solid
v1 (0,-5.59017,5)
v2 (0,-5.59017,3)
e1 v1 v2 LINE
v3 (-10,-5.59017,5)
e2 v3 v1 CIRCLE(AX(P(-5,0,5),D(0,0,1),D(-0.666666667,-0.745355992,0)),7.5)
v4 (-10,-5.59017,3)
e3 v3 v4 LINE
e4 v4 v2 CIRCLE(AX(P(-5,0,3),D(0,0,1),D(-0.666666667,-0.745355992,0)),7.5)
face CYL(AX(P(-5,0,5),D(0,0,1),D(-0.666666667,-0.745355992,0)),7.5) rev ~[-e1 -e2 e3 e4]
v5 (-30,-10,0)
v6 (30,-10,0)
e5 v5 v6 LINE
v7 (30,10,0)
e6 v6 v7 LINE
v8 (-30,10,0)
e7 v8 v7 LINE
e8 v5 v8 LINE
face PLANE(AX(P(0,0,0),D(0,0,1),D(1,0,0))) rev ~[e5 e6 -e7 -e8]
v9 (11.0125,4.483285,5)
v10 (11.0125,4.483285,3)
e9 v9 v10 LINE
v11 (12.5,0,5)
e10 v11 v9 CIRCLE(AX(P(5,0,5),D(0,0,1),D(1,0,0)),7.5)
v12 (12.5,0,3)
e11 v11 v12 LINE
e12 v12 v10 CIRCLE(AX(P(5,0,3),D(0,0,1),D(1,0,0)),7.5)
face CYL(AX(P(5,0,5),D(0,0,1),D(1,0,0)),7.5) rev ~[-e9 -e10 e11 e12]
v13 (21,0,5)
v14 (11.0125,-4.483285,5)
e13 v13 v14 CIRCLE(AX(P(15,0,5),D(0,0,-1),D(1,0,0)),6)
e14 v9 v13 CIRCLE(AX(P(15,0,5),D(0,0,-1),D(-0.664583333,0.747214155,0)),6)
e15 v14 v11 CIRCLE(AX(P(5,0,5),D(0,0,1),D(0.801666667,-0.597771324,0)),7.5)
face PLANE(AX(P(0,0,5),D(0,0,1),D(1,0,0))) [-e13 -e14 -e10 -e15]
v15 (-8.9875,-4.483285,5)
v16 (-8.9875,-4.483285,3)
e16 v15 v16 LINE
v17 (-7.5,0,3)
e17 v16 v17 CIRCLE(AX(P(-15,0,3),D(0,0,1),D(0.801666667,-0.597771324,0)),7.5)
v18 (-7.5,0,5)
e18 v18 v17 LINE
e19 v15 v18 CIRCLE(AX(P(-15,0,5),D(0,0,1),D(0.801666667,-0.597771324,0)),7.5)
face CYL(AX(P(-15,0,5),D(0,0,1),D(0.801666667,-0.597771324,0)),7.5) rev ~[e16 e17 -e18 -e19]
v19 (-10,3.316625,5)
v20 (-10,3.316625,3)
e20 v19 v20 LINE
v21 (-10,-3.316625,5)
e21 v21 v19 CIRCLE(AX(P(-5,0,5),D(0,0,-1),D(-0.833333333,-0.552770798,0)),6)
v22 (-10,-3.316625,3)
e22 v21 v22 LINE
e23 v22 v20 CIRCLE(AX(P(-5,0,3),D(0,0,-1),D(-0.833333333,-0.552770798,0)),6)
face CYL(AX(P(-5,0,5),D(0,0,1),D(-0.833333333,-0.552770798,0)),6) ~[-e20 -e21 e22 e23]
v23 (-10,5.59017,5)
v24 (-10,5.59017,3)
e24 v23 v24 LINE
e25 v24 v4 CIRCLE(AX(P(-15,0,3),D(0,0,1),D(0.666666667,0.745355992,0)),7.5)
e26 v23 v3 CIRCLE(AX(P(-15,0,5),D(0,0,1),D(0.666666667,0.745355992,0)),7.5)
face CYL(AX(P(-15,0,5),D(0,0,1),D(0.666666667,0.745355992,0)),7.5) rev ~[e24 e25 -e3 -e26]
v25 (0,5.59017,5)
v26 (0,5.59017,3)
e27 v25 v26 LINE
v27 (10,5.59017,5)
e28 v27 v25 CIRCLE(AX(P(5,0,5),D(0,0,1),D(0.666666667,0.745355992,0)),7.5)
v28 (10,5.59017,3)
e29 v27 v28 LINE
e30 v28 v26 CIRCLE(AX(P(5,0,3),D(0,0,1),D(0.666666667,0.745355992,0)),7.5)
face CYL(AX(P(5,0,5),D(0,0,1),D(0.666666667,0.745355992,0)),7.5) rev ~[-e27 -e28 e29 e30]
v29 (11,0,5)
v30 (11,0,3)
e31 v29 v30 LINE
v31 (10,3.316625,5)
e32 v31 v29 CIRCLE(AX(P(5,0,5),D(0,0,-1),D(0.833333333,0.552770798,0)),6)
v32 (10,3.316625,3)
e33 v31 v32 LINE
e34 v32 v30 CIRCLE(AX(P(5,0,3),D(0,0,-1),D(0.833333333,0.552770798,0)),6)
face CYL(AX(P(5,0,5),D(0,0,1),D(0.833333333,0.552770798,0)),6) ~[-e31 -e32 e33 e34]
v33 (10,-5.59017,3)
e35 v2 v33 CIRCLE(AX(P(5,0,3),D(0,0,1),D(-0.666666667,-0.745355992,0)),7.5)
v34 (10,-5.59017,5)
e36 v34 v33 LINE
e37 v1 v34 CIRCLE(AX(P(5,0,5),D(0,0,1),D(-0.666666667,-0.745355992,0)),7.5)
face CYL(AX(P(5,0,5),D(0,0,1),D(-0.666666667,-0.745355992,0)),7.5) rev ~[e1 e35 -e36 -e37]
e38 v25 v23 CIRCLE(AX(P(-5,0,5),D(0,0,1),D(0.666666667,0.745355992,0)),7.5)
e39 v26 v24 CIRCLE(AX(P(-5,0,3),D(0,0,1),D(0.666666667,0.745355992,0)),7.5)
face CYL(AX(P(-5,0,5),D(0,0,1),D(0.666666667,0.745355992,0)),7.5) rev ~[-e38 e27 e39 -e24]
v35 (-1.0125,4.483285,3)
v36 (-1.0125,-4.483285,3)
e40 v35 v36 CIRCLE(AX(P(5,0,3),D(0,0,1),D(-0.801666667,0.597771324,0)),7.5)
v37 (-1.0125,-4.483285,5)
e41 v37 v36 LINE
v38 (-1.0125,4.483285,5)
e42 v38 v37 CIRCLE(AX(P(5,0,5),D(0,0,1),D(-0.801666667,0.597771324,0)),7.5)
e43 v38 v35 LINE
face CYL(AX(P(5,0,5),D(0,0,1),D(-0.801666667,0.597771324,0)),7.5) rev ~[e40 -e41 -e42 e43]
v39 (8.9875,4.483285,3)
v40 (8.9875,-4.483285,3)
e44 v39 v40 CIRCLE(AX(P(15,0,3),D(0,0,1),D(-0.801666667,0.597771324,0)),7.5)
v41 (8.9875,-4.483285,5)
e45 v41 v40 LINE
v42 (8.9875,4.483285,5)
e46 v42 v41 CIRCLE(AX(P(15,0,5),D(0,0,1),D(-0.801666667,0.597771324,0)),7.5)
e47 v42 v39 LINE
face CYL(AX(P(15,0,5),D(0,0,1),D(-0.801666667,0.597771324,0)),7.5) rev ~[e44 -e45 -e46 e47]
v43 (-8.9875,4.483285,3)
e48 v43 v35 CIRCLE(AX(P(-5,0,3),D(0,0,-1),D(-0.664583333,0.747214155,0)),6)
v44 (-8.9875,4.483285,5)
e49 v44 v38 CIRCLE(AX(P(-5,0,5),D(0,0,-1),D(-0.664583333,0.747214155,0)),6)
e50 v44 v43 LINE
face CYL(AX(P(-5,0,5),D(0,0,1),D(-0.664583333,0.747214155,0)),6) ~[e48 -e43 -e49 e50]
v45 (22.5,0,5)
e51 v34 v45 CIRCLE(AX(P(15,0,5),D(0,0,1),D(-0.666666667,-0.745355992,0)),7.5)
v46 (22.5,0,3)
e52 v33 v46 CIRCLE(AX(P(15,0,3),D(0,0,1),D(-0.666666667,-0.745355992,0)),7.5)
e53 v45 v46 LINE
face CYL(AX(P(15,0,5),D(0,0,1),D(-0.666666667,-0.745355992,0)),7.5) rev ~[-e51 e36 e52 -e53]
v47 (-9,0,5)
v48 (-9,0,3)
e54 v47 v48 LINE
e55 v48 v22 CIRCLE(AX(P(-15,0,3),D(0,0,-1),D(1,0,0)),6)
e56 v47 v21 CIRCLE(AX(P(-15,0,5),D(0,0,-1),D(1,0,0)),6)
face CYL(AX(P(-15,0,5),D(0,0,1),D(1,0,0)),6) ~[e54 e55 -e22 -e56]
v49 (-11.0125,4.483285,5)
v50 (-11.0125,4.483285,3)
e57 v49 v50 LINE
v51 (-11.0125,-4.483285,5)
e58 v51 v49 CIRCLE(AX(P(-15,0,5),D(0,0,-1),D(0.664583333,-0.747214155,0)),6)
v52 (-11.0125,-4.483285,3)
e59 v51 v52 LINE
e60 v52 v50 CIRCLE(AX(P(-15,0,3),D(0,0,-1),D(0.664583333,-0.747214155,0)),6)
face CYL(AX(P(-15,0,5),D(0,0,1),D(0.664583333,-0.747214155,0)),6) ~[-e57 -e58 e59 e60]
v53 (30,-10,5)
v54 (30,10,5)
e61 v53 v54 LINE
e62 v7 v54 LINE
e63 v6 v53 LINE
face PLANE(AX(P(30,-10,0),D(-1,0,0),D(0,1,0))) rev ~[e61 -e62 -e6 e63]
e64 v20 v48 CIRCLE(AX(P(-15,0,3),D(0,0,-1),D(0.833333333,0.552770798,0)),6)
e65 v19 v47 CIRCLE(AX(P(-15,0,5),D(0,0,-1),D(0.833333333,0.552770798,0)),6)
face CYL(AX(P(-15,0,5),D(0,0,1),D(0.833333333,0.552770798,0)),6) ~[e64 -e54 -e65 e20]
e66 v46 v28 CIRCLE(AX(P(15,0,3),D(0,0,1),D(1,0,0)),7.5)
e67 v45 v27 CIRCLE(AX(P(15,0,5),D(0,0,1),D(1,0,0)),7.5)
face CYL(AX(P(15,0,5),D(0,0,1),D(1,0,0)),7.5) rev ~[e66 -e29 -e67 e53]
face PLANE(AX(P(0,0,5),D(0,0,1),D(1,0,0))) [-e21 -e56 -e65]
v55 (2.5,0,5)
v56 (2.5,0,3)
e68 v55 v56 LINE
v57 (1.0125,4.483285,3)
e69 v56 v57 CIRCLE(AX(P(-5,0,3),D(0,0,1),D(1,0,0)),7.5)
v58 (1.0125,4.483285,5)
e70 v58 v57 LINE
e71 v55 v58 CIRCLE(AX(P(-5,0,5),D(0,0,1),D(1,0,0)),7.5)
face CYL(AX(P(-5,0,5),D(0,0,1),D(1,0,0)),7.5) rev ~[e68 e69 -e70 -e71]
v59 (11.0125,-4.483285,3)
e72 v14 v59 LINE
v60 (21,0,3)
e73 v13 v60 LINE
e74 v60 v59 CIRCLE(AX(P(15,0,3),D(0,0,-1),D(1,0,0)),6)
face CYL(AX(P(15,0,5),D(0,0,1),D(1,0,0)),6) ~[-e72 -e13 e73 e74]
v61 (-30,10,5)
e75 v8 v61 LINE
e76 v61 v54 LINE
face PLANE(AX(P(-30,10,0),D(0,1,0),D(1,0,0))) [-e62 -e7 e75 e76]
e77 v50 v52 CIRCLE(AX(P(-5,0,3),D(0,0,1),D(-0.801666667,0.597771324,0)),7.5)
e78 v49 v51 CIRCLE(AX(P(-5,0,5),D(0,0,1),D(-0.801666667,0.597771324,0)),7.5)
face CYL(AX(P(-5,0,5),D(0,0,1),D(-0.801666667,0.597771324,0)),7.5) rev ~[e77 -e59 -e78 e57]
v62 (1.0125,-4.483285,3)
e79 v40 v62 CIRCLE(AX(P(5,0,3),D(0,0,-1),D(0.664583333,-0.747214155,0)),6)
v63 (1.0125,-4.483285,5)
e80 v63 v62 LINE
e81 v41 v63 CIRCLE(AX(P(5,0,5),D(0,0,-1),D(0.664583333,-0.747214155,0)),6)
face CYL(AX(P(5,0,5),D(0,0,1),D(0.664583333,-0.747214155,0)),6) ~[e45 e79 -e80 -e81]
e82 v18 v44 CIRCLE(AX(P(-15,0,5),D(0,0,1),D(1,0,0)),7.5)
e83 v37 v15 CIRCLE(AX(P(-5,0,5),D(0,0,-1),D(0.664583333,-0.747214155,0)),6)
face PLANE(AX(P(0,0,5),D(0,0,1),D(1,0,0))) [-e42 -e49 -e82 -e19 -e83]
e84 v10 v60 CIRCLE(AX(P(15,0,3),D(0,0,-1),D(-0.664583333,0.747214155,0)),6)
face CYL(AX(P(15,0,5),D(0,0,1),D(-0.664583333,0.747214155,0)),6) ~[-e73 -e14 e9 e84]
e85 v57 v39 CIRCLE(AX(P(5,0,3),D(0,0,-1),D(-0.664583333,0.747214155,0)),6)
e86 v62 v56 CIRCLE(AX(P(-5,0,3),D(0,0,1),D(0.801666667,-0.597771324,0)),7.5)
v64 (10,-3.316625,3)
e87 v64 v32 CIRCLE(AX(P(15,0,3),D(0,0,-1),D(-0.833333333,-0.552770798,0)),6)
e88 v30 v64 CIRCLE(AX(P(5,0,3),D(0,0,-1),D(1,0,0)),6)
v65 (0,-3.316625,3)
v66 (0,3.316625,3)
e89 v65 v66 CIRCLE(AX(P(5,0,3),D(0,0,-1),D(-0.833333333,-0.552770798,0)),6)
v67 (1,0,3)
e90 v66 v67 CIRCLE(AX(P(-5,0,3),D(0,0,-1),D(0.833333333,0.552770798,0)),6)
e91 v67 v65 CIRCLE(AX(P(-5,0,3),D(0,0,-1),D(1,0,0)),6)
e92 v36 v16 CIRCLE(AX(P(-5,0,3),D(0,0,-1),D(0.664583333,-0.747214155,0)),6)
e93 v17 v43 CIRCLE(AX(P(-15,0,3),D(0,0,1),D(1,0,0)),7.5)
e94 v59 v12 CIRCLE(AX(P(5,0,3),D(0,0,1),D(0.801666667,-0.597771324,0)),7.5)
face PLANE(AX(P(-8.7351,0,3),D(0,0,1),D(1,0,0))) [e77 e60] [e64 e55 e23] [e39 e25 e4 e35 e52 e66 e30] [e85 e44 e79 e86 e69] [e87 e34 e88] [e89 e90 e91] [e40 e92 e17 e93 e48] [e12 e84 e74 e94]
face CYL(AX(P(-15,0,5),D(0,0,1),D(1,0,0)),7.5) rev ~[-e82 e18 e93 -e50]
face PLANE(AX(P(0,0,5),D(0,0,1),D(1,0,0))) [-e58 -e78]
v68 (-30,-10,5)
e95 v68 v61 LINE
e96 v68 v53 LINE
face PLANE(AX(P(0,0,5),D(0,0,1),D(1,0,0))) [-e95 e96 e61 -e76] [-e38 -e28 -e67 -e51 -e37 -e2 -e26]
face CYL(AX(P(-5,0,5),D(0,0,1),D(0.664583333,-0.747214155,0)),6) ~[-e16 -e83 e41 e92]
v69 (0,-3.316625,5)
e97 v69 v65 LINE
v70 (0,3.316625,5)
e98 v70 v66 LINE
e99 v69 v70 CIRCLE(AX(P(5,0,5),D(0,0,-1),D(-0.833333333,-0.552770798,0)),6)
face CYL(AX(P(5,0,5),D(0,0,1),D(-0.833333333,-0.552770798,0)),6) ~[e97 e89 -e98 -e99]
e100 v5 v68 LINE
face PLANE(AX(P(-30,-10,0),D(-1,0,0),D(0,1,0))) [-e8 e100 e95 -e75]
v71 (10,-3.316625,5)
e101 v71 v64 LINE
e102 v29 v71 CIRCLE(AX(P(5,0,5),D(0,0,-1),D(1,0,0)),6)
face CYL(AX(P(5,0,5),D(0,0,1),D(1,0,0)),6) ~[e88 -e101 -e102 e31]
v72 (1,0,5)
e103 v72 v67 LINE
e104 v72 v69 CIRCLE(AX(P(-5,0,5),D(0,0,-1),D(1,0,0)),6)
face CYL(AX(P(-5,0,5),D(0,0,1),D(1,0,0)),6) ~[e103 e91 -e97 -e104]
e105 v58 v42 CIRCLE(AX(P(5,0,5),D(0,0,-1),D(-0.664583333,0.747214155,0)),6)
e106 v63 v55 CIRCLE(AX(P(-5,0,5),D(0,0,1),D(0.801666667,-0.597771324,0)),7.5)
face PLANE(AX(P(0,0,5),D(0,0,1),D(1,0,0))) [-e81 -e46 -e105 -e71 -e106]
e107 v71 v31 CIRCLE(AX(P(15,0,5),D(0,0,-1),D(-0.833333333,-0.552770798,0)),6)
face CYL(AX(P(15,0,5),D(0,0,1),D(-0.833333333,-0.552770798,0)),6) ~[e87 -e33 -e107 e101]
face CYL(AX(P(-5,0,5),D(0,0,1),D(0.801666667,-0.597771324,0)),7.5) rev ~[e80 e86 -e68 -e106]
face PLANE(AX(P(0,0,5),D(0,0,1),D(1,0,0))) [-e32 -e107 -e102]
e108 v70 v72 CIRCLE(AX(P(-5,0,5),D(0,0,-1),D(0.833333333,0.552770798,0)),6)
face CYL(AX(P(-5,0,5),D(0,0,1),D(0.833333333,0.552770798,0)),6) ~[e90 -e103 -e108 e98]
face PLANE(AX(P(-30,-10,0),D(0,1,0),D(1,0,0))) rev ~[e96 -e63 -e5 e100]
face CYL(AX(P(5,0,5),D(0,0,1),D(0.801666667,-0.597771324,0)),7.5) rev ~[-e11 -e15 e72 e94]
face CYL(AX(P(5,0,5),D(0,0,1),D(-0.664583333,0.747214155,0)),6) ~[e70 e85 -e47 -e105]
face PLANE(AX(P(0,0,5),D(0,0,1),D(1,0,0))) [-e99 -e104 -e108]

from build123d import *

# Parameters (mm, degrees)
F0_W     = 60
F0_H     = 20
F1_DEPTH = 5
F3_DEPTH = 2


with BuildPart() as f1:
    # F0 (on Top) → F1 (new body)
    with BuildSketch(Plane.XY):
        Rectangle(F0_W, F0_H)
    extrude(amount=F1_DEPTH)

    # F2 (on face) → F3 (cut)
    with BuildSketch(Plane.XY.offset(5)):
        with BuildLine():
            ThreePointArc((-8.9875, -4.4832849285), (-7.8815819875, -2.3618054535), (-7.5, 0))
            ThreePointArc((-7.5, 0), (-7.8815819875, 2.3618054535), (-8.9875, 4.4832849285))
            ThreePointArc((-8.9875, 4.4832849285), (-9.5314526404, 3.9326755483), (-10, 3.3166247904))
            ThreePointArc((-10, 3.3166247904), (-9.2554373535, 1.7320508076), (-9, 0))
            ThreePointArc((-9, 0), (-9.2554373535, -1.7320508076), (-10, -3.3166247904))
            ThreePointArc((-10, -3.3166247904), (-9.5314526404, -3.9326755483), (-8.9875, -4.4832849285))
        make_face()
        with BuildLine():
            ThreePointArc((-10, 3.3166247904), (-9.5314526404, 3.9326755483), (-8.9875, 4.4832849285))
            ThreePointArc((-8.9875, 4.4832849285), (-9.4660061735, 5.0621055232), (-10, 5.5901699437))
            ThreePointArc((-10, 5.5901699437), (-10.5339938265, 5.0621055232), (-11.0125, 4.4832849285))
            ThreePointArc((-11.0125, 4.4832849285), (-10.4685473596, 3.9326755483), (-10, 3.3166247904))
        make_face()
        with BuildLine():
            ThreePointArc((-10, 5.5901699437), (-9.4660061735, 5.0621055232), (-8.9875, 4.4832849285))
            ThreePointArc((-8.9875, 4.4832849285), (-5, 6), (-1.0125, 4.4832849285))
            ThreePointArc((-1.0125, 4.4832849285), (-0.5339938265, 5.0621055232), (0, 5.5901699437))
            ThreePointArc((0, 5.5901699437), (-5, 7.5), (-10, 5.5901699437))
        make_face()
        with BuildLine():
            ThreePointArc((-1.0125, -4.4832849285), (-5, -6), (-8.9875, -4.4832849285))
            ThreePointArc((-8.9875, -4.4832849285), (-9.4660061735, -5.0621055232), (-10, -5.5901699437))
            ThreePointArc((-10, -5.5901699437), (-5, -7.5), (0, -5.5901699437))
            ThreePointArc((0, -5.5901699437), (-0.5339938265, -5.0621055232), (-1.0125, -4.4832849285))
        make_face()
        with BuildLine():
            ThreePointArc((-10, -5.5901699437), (-9.4660061735, -5.0621055232), (-8.9875, -4.4832849285))
            ThreePointArc((-8.9875, -4.4832849285), (-9.5314526404, -3.9326755483), (-10, -3.3166247904))
            ThreePointArc((-10, -3.3166247904), (-10.4685473596, -3.9326755483), (-11.0125, -4.4832849285))
            ThreePointArc((-11.0125, -4.4832849285), (-10.5339938265, -5.0621055232), (-10, -5.5901699437))
        make_face()
        with BuildLine():
            ThreePointArc((-11.0125, 4.4832849285), (-10.5339938265, 5.0621055232), (-10, 5.5901699437))
            ThreePointArc((-10, 5.5901699437), (-22.5, 0), (-10, -5.5901699437))
            ThreePointArc((-10, -5.5901699437), (-10.5339938265, -5.0621055232), (-11.0125, -4.4832849285))
            ThreePointArc((-11.0125, -4.4832849285), (-21, 0), (-11.0125, 4.4832849285))
        make_face()
        with BuildLine():
            ThreePointArc((0, 5.5901699437), (-0.5339938265, 5.0621055232), (-1.0125, 4.4832849285))
            ThreePointArc((-1.0125, 4.4832849285), (-0.4685473596, 3.9326755483), (0, 3.3166247904))
            ThreePointArc((0, 3.3166247904), (0.4685473596, 3.9326755483), (1.0125, 4.4832849285))
            ThreePointArc((1.0125, 4.4832849285), (0.5339938265, 5.0621055232), (0, 5.5901699437))
        make_face()
        with BuildLine():
            ThreePointArc((0, 3.3166247904), (-0.4685473596, 3.9326755483), (-1.0125, 4.4832849285))
            ThreePointArc((-1.0125, 4.4832849285), (-2.5, 0), (-1.0125, -4.4832849285))
            ThreePointArc((-1.0125, -4.4832849285), (-0.4685473596, -3.9326755483), (0, -3.3166247904))
            ThreePointArc((0, -3.3166247904), (-1, 0), (0, 3.3166247904))
        make_face()
        with BuildLine():
            ThreePointArc((-10, -3.3166247904), (-11, 0), (-10, 3.3166247904))
            ThreePointArc((-10, 3.3166247904), (-10.4685473596, 3.9326755483), (-11.0125, 4.4832849285))
            ThreePointArc((-11.0125, 4.4832849285), (-12.5, 0), (-11.0125, -4.4832849285))
            ThreePointArc((-11.0125, -4.4832849285), (-10.4685473596, -3.9326755483), (-10, -3.3166247904))
        make_face()
        with BuildLine():
            ThreePointArc((0, -3.3166247904), (-0.4685473596, -3.9326755483), (-1.0125, -4.4832849285))
            ThreePointArc((-1.0125, -4.4832849285), (-0.5339938265, -5.0621055232), (0, -5.5901699437))
            ThreePointArc((0, -5.5901699437), (0.5339938265, -5.0621055232), (1.0125, -4.4832849285))
            ThreePointArc((1.0125, -4.4832849285), (0.4685473596, -3.9326755483), (0, -3.3166247904))
        make_face()
        with BuildLine():
            ThreePointArc((10, 5.5901699437), (5, 7.5), (0, 5.5901699437))
            ThreePointArc((0, 5.5901699437), (0.5339938265, 5.0621055232), (1.0125, 4.4832849285))
            ThreePointArc((1.0125, 4.4832849285), (5, 6), (8.9875, 4.4832849285))
            ThreePointArc((8.9875, 4.4832849285), (9.4660061735, 5.0621055232), (10, 5.5901699437))
        make_face()
        with BuildLine():
            ThreePointArc((1.0125, 4.4832849285), (0.4685473596, 3.9326755483), (0, 3.3166247904))
            ThreePointArc((0, 3.3166247904), (0.7445626465, 1.7320508076), (1, 0))
            ThreePointArc((1, 0), (0.7445626465, -1.7320508076), (0, -3.3166247904))
            ThreePointArc((0, -3.3166247904), (0.4685473596, -3.9326755483), (1.0125, -4.4832849285))
            ThreePointArc((1.0125, -4.4832849285), (2.1184180125, -2.3618054535), (2.5, 0))
            ThreePointArc((2.5, 0), (2.1184180125, 2.3618054535), (1.0125, 4.4832849285))
        make_face()
        with BuildLine():
            ThreePointArc((1.0125, -4.4832849285), (0.5339938265, -5.0621055232), (0, -5.5901699437))
            ThreePointArc((0, -5.5901699437), (5, -7.5), (10, -5.5901699437))
            ThreePointArc((10, -5.5901699437), (9.4660061735, -5.0621055232), (8.9875, -4.4832849285))
            ThreePointArc((8.9875, -4.4832849285), (5, -6), (1.0125, -4.4832849285))
        make_face()
        with BuildLine():
            ThreePointArc((22.5, 0), (18.0618621785, 6.8465319688), (10, 5.5901699437))
            ThreePointArc((10, 5.5901699437), (10.5339938265, 5.0621055232), (11.0125, 4.4832849285))
            ThreePointArc((11.0125, 4.4832849285), (17.4571324751, 5.4738012386), (21, 0))
            ThreePointArc((21, 0), (17.4571324751, -5.4738012386), (11.0125, -4.4832849285))
            ThreePointArc((11.0125, -4.4832849285), (10.5339938265, -5.0621055232), (10, -5.5901699437))
            ThreePointArc((10, -5.5901699437), (18.0618621785, -6.8465319688), (22.5, 0))
        make_face()
        with BuildLine():
            ThreePointArc((11.0125, 4.4832849285), (10.5339938265, 5.0621055232), (10, 5.5901699437))
            ThreePointArc((10, 5.5901699437), (9.4660061735, 5.0621055232), (8.9875, 4.4832849285))
            ThreePointArc((8.9875, 4.4832849285), (9.5314526404, 3.9326755483), (10, 3.3166247904))
            ThreePointArc((10, 3.3166247904), (10.4685473596, 3.9326755483), (11.0125, 4.4832849285))
        make_face()
        with BuildLine():
            ThreePointArc((8.9875, -4.4832849285), (9.4660061735, -5.0621055232), (10, -5.5901699437))
            ThreePointArc((10, -5.5901699437), (10.5339938265, -5.0621055232), (11.0125, -4.4832849285))
            ThreePointArc((11.0125, -4.4832849285), (10.4685473596, -3.9326755483), (10, -3.3166247904))
            ThreePointArc((10, -3.3166247904), (9.5314526404, -3.9326755483), (8.9875, -4.4832849285))
        make_face()
        with BuildLine():
            ThreePointArc((10, 3.3166247904), (9.5314526404, 3.9326755483), (8.9875, 4.4832849285))
            ThreePointArc((8.9875, 4.4832849285), (7.5, 0), (8.9875, -4.4832849285))
            ThreePointArc((8.9875, -4.4832849285), (9.5314526404, -3.9326755483), (10, -3.3166247904))
            ThreePointArc((10, -3.3166247904), (9, 0), (10, 3.3166247904))
        make_face()
        with BuildLine():
            ThreePointArc((12.5, 0), (12.1184180125, 2.3618054535), (11.0125, 4.4832849285))
            ThreePointArc((11.0125, 4.4832849285), (10.4685473596, 3.9326755483), (10, 3.3166247904))
            ThreePointArc((10, 3.3166247904), (10.7445626465, 1.7320508076), (11, 0))
            ThreePointArc((11, 0), (10.7445626465, -1.7320508076), (10, -3.3166247904))
            ThreePointArc((10, -3.3166247904), (10.4685473596, -3.9326755483), (11.0125, -4.4832849285))
            ThreePointArc((11.0125, -4.4832849285), (12.1184180125, -2.3618054535), (12.5, 0))
        make_face()
    extrude(amount=-F3_DEPTH, mode=Mode.SUBTRACT)


solid = f1.part
